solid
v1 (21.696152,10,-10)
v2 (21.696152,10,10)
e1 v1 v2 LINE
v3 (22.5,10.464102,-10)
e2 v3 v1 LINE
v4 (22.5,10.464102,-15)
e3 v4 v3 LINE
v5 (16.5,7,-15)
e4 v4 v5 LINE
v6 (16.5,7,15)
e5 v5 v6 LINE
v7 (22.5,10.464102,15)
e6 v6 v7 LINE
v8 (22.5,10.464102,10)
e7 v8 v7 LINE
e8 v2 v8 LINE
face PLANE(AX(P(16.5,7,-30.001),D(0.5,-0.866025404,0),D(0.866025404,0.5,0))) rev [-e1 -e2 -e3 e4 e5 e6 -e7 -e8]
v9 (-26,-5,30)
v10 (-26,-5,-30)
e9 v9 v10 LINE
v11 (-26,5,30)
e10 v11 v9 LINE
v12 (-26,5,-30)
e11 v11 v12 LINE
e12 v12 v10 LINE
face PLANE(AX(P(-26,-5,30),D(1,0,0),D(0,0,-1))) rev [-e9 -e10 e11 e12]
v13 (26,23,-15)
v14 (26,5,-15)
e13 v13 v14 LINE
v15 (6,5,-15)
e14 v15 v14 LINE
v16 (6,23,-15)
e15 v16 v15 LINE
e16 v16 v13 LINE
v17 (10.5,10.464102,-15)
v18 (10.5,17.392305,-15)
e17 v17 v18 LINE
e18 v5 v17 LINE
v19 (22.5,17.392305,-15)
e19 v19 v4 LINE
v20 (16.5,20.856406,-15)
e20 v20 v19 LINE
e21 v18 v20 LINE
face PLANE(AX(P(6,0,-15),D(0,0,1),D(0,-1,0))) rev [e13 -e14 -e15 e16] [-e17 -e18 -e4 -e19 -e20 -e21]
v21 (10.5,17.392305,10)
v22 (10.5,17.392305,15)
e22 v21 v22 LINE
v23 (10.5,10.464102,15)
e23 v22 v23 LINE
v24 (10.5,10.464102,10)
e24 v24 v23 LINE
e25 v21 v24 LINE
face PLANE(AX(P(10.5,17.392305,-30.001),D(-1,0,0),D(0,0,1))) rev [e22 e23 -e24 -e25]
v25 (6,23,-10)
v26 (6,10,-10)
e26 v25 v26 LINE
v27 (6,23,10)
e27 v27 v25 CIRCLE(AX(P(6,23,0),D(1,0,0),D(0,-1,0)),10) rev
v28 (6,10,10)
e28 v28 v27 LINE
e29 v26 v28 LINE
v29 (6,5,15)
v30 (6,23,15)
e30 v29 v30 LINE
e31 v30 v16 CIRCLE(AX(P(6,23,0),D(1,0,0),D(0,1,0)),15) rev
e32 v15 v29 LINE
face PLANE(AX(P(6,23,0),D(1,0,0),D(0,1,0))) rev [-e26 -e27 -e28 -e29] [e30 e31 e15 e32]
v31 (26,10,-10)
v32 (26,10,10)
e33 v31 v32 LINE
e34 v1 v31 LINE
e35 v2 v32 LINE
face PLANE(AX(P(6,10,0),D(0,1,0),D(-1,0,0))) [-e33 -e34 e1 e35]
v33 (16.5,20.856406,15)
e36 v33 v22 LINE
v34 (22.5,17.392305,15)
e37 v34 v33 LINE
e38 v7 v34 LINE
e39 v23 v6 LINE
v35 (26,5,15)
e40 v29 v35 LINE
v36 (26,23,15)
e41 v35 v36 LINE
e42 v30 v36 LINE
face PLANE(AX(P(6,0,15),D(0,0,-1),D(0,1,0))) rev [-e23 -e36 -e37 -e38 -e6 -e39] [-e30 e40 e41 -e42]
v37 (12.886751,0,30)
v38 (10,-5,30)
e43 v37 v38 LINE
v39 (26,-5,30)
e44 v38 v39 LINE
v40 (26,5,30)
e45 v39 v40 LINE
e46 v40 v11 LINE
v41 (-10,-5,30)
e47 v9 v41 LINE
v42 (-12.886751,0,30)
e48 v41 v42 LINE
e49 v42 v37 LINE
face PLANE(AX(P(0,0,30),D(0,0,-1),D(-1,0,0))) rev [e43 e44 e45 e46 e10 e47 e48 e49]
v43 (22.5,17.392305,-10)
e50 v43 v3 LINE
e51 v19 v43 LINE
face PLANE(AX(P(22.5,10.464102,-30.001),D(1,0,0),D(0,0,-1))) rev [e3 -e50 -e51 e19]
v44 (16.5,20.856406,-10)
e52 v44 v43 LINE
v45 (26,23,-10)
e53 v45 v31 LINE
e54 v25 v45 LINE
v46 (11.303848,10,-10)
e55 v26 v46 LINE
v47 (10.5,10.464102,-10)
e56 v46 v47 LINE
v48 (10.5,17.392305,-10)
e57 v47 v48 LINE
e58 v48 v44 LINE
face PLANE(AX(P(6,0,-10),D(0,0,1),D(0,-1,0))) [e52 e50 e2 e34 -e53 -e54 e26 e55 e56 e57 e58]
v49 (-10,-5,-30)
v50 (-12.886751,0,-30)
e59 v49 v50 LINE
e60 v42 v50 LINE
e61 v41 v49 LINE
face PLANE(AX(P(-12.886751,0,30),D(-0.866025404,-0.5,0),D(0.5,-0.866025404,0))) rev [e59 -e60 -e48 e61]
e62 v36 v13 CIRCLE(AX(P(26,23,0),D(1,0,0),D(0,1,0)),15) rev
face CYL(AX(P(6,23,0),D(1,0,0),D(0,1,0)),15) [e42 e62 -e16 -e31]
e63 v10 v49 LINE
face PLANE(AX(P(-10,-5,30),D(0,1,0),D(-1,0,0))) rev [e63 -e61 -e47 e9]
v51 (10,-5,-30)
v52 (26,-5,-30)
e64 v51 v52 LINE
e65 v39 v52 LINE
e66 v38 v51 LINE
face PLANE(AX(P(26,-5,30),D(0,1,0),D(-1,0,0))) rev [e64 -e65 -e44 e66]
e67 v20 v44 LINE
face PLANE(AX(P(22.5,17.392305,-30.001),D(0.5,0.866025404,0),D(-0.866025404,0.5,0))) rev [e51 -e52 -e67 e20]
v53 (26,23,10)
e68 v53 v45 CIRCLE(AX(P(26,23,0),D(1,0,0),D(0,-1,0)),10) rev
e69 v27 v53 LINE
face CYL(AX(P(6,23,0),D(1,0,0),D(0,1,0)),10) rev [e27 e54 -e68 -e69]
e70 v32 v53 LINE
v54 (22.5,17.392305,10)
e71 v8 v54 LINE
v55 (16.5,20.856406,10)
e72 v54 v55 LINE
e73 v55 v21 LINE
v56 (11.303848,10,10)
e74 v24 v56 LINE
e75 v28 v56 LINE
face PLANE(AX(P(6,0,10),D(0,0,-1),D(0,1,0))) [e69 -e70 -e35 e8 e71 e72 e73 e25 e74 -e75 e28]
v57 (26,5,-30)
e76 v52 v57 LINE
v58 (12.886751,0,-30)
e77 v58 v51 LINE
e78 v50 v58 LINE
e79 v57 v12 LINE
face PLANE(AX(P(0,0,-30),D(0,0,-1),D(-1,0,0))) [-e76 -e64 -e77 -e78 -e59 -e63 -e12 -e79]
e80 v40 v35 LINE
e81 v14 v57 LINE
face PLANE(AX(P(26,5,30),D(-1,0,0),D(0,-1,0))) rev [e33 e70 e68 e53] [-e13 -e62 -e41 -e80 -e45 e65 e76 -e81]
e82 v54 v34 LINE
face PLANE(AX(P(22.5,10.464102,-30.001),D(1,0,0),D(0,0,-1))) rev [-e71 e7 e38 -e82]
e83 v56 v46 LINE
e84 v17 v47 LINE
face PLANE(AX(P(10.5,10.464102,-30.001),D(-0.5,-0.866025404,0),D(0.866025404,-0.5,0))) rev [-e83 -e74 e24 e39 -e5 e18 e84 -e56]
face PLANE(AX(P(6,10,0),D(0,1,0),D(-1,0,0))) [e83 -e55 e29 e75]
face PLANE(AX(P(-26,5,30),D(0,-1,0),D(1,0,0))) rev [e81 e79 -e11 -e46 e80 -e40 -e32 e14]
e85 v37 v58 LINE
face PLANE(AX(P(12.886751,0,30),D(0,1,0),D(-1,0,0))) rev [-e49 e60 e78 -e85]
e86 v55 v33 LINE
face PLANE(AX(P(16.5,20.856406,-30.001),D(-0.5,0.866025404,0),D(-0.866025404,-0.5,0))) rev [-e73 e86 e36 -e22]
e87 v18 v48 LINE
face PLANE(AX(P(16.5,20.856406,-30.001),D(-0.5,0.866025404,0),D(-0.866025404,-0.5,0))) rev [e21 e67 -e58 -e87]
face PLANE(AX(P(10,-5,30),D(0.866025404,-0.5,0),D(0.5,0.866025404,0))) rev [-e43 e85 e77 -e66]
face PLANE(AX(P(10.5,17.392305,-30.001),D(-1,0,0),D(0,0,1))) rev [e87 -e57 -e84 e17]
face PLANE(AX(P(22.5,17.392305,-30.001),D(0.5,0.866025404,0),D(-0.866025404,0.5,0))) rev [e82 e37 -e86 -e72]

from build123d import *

# Parameters (mm, degrees)
EXTRUDE_2_DEPTH     = 30
EXTRUDE_START       = -20
EXTRUDE_1_DEPTH     = 20
CUT_EXTRUDE_1_REACH = 59.671


# Read off the part's stored shape, not the designer's step: 拉伸-薄壁1
with BuildPart() as part:
    # 草图1 → 凸台-拉伸2 (new, symmetric)
    with BuildSketch(Plane.XY):
        Polygon((-26, 5), (26, 5), (26, -5), (10, -5), (12.886751346, 0), (-12.886751346, 0), (-10, -5), (-26, -5), align=None)
    extrude(amount=EXTRUDE_2_DEPTH, both=True)

    # 拉伸-薄壁1 outline → 拉伸-薄壁1 (add)
    with BuildSketch(Plane(origin=(26, 0, 0), x_dir=(0, 0, -1), z_dir=(1, 0, 0)).offset(EXTRUDE_START)):
        with BuildLine():
            Line((15, 5), (15, 23))
            ThreePointArc((15, 23), (0, 38), (-15, 23))
            Line((-15, 23), (-15, 5))
            Line((-15, 5), (15, 5))
        make_face()
        with BuildLine():
            ThreePointArc((-10, 23), (0, 33), (10, 23))
            Line((10, 23), (10, 10))
            Line((10, 10), (-10, 10))
            Line((-10, 10), (-10, 23))
        make_face(mode=Mode.SUBTRACT)
    extrude(amount=EXTRUDE_1_DEPTH)

    # 草图6 → 切除-拉伸1 (cut, up to next)
    with BuildSketch(Plane(origin=(0, 20, 15), x_dir=(1, 0, 0), z_dir=(0, 0, 1)), mode=Mode.PRIVATE) as cut_extrude_1_sk1:
        Polygon((22.5, -2.607695155), (16.5, 0.856406461), (10.5, -2.607695155), (10.5, -9.535898385), (16.5, -13), (22.5, -9.535898385), align=None)
    cut_extrude_1_tool1 = extrude(cut_extrude_1_sk1.sketch, amount=-CUT_EXTRUDE_1_REACH, mode=Mode.PRIVATE) & part.part
    add(cut_extrude_1_tool1.solids().sort_by_distance((16.5, 13.928203, 15))[0], mode=Mode.SUBTRACT)


solid = part.part
